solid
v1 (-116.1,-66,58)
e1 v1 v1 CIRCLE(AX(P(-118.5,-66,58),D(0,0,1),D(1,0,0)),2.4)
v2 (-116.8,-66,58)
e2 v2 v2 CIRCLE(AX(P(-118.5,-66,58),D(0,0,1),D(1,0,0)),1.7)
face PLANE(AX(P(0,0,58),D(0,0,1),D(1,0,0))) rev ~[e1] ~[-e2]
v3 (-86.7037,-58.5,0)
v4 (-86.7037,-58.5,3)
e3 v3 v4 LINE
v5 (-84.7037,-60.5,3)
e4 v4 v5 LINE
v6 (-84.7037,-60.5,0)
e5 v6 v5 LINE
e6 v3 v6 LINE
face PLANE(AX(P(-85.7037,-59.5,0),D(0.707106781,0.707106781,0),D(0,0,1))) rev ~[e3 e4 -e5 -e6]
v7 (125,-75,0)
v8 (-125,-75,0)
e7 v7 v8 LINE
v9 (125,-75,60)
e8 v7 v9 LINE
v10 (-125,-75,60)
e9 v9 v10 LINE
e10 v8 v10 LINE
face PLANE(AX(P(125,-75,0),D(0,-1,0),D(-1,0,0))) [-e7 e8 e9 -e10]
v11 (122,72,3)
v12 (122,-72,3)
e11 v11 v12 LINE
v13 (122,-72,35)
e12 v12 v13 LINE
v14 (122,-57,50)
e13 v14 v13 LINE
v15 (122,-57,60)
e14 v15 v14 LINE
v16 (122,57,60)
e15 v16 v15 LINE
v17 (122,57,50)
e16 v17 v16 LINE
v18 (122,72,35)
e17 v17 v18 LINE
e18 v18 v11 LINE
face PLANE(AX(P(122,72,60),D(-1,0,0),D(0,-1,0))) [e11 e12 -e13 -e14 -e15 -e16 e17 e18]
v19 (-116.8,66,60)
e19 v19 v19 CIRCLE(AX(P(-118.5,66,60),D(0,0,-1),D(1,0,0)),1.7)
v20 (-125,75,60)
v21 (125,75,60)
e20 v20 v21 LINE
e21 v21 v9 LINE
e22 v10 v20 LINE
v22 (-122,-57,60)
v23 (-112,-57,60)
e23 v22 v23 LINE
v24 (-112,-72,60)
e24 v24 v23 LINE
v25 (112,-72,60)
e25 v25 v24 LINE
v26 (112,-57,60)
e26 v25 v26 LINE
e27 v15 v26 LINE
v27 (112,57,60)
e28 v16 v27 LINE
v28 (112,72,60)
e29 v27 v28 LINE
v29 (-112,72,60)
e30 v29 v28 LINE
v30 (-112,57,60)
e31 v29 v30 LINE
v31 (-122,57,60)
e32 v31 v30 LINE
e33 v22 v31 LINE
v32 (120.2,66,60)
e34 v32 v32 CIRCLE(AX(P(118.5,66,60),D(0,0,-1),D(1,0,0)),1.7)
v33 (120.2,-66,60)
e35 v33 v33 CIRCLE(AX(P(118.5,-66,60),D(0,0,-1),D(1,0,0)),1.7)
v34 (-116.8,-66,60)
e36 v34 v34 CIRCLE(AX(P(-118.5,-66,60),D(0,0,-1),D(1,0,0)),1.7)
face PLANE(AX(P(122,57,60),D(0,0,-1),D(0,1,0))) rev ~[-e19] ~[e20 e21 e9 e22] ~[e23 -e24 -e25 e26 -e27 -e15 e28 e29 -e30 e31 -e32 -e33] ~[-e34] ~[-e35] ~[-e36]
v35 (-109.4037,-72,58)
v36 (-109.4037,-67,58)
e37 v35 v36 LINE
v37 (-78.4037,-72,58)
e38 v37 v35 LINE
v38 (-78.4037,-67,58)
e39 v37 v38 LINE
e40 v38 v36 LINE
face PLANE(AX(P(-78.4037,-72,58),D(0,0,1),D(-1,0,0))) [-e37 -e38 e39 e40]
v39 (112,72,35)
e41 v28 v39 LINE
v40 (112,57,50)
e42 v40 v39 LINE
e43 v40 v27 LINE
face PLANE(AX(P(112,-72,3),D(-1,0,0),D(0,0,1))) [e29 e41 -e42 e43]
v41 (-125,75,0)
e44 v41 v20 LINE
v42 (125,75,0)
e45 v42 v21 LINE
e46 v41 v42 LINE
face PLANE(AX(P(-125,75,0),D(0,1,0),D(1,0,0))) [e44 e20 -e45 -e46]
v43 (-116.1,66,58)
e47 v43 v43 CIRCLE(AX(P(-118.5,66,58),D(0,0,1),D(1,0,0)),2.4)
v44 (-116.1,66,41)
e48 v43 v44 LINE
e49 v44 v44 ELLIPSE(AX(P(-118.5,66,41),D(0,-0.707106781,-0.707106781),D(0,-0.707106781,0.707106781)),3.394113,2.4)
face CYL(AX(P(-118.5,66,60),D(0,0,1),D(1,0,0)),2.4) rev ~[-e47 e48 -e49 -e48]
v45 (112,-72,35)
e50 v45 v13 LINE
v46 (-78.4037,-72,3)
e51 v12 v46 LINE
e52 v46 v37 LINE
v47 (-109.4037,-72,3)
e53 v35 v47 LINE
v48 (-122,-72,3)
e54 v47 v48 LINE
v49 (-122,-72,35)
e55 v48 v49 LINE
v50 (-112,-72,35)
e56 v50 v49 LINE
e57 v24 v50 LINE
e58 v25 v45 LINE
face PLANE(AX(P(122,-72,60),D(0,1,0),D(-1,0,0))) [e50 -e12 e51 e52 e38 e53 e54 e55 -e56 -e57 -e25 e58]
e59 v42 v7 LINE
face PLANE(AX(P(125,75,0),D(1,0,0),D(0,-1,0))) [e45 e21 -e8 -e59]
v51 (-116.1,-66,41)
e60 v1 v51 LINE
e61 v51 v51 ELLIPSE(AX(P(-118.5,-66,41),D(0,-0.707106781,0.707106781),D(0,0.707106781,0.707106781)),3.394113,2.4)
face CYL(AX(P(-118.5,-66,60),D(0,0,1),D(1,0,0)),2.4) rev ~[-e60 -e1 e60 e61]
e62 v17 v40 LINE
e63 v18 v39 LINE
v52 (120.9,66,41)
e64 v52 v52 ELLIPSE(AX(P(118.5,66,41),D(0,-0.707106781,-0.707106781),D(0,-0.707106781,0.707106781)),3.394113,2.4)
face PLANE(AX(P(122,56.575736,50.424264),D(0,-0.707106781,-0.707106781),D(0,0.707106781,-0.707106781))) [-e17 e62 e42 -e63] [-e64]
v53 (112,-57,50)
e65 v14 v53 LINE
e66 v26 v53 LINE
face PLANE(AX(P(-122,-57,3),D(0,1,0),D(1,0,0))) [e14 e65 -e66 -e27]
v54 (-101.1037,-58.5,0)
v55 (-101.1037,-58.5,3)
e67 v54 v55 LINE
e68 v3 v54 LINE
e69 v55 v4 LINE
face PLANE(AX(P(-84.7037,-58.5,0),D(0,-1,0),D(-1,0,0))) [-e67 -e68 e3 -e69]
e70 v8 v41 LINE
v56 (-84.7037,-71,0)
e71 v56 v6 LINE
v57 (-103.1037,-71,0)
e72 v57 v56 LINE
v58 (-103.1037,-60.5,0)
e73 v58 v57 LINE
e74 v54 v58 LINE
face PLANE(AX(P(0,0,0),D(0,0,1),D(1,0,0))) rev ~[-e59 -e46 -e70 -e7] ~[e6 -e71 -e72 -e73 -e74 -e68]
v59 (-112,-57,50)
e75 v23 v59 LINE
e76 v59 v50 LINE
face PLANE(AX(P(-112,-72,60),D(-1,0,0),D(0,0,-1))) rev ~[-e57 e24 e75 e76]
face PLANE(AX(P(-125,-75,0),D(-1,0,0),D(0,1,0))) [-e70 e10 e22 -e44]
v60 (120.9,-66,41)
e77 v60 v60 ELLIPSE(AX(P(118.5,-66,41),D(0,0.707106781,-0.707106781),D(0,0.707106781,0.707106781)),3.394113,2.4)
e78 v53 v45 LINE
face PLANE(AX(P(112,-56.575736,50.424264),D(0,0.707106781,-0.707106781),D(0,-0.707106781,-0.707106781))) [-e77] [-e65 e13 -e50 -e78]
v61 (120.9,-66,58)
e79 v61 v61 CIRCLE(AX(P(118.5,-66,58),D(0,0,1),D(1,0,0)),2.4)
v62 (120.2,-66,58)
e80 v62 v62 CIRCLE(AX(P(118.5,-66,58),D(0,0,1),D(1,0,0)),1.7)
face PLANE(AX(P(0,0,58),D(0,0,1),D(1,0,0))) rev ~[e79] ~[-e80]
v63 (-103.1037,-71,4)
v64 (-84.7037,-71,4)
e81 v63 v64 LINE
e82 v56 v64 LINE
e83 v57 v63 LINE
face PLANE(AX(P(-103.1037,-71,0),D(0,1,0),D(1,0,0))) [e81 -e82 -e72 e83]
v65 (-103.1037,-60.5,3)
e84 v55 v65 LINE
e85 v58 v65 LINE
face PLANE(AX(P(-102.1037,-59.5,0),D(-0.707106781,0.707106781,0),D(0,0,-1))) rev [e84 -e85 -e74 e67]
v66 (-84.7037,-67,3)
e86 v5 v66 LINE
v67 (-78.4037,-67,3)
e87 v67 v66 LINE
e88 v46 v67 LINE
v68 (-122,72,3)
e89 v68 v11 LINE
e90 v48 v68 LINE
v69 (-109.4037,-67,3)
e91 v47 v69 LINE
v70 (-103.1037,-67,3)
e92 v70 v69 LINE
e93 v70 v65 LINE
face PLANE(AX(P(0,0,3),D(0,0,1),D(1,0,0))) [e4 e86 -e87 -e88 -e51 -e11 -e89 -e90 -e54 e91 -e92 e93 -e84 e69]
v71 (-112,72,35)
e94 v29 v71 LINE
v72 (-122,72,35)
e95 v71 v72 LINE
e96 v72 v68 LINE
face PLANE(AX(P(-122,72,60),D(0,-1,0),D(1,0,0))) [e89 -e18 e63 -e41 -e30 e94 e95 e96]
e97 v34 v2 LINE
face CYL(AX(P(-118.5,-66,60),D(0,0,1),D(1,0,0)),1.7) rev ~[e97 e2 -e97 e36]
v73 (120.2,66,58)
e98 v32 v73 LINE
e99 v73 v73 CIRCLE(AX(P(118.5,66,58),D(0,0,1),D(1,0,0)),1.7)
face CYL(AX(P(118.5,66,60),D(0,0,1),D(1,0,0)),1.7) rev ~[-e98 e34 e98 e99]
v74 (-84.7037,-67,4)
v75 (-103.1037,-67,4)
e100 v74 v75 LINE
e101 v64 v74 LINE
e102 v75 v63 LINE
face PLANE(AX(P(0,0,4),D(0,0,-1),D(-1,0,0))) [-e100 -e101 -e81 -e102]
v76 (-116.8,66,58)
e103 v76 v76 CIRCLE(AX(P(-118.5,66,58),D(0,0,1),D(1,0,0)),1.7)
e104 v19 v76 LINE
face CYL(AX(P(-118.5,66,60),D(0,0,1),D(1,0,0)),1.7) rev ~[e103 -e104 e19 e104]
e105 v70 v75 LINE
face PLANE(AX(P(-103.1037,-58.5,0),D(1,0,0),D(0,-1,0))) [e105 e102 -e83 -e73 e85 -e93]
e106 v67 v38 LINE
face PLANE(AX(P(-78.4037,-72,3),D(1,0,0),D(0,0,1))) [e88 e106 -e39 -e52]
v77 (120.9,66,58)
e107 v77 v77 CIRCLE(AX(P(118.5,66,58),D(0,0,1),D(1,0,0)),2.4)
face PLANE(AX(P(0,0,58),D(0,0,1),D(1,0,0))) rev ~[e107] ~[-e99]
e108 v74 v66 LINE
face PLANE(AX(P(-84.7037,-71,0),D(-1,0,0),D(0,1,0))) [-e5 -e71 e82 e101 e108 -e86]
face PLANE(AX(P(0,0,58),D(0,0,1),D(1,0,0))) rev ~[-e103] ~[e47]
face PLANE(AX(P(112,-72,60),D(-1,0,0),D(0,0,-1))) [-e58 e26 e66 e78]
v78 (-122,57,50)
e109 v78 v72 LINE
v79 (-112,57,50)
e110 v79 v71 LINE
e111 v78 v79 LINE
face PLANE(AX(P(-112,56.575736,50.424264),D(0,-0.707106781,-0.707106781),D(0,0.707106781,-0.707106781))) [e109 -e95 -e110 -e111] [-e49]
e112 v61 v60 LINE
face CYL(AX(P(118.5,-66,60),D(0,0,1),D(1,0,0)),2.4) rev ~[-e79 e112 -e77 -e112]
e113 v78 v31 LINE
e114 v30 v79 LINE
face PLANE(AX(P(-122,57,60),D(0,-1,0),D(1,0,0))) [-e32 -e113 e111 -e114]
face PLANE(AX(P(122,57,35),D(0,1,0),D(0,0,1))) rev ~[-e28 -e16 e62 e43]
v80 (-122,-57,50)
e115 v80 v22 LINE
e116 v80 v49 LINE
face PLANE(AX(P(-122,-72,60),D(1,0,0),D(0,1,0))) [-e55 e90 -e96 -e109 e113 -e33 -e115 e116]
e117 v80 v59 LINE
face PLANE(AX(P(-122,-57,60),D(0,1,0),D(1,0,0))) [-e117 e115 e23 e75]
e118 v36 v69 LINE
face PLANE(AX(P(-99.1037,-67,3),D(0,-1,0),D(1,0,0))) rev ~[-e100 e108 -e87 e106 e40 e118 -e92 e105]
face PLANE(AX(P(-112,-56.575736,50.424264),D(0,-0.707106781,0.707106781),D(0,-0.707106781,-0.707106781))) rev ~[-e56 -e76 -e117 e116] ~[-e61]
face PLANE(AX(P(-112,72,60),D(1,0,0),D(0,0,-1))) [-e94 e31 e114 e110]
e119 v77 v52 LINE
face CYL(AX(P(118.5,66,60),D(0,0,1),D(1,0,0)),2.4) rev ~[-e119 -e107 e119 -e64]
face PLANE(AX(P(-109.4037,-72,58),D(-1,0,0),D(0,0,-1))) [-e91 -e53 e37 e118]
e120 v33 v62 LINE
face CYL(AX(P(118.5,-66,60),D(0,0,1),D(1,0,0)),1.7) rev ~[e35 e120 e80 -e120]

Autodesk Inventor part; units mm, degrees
ref_plane "YZ Plane" through (0, 0, 0) normal (1, 0, 0) x (0, 1, 0)
ref_plane "XZ Plane" through (0, 0, 0) normal (0, 1, 0) x (-1, 0, 0)
ref_plane "XY Plane" through (0, 0, 0) normal (0, 0, 1) x (1, 0, 0)
sketch "Sketch7" plane through (0, 0, 0) normal (0, 0, 1) x (1, 0, 0)
  line L0 (125, -75) -> (-125, -75)
  line L1 (-125, -75) -> (-125, 75)
  line L2 (-125, 75) -> (125, 75)
  line L3 (125, 75) -> (125, -75)
  line L4 (125, -75) -> (-125, 75) construction
  line L5 (-125, -75) -> (125, 75) construction
  point P0 (0, 0)
  dimension "d15" = 250
  dimension "d16" = 150
extrude "Box Outside" add sketch "Sketch7" along normal blind 60
sketch "Sketch8" plane through (0, 0, 60) normal (0, 0, 1) x (1, 0, 0)
  line L0 (-122, 72) -> (122, 72)
  line L1 (122, 72) -> (122, -72)
  line L2 (122, -72) -> (-122, -72)
  line L3 (-122, -72) -> (-122, 72)
  line L4 (125, 75) -> (-125, 75) projected
  line L5 (-125, 75) -> (-125, -75) projected
  line L6 (-125, -75) -> (125, -75) projected
  line L7 (125, -75) -> (125, 75) projected
  point P0 (0, 0)
  dimension "d19" = 3
  dimension "d20" = 3
  dimension "d21" = 3
  dimension "d22" = 3
extrude "Box Cut" cut sketch "Sketch8" against normal blind 57 contours L0 L1 L2 L3
sketch "Sketch9" plane through (-122, -72, 60) normal (0, 1, 0) x (1, 0, 0)
  line L0 (0, 0) -> (10, 0)
  line L1 (10, 0) -> (10, 25)
  line L2 (10, 25) -> (0, 25)
  line L3 (0, 25) -> (0, 0)
  point P0 (122, 60)
  dimension "d25" = 10
  dimension "d26" = 25
extrude "ScrewHole Box LB" add sketch "Sketch9" along normal blind 15
sketch "Sketch10" plane through (-122, -72, 3) normal (0, 1, 0) x (1, 0, 0)
  line L0 (244, -57) -> (244, 0) projected
  line L1 (244, -57) -> (234, -57)
  line L2 (234, -57) -> (234, -32)
  line L3 (234, -32) -> (244, -32)
  line L4 (244, -32) -> (244, -57)
  point P0 (122, 3)
  dimension "d29" = 10
  dimension "d30" = 25
extrude "ScrewHole Box RB" add sketch "Sketch10" along normal blind 15
sketch "Sketch11" plane through (-122, 72, 60) normal (0, -1, 0) x (1, 0, 0)
  line L0 (0, 0) -> (244, 0) projected
  line L1 (0, 0) -> (10, 0)
  line L2 (10, 0) -> (10, -25)
  line L3 (10, -25) -> (0, -25)
  line L4 (0, -25) -> (0, 0)
  point P0 (122, -60)
  dimension "d33" = 10
  dimension "d34" = 25
extrude "ScrewHole Box LU" add sketch "Sketch11" along normal blind 15
sketch "Sketch13" plane through (122, -72, 3) normal (-1, 0, 0) x (0, 0, 1)
  line L0 (57, 144) -> (0, 144) projected
  line L1 (57, 144) -> (32, 144)
  line L2 (32, 144) -> (32, 129)
  line L3 (32, 129) -> (57, 129)
  line L4 (57, 129) -> (57, 144)
  point P0 (-3, 72)
  dimension "d37" = 25
  dimension "d38" = 15
extrude "ScrewHole Box RU" add sketch "Sketch13" along normal blind 10
sketch "Sketch27" plane through (0, 0, 60) normal (0, 0, 1) x (1, 0, 0)
  line L0 (-112, -72) -> (-112, -57) projected
  line L1 (-125, 75) -> (-125, -75) projected
  line L2 (-112, -57) -> (-125, -57)
  line L3 (-125, -57) -> (-125, -75)
  line L4 (-125, -75) -> (-112, -75)
  line L5 (-112, -75) -> (-112, -57)
  line L6 (-112, -57) -> (-125, -75)
  line L7 (-112, -75) -> (-125, -57)
  circle A0 centre (-118.5, -66) radius 2.4
  point P0 (0, 0)
  dimension "d84" = 4.8
extrude "Outside ScrewHole LB" cut sketch "Sketch27" against normal blind 26 contours A0 L7 L6 | L6 L7 A0 | A0 L6 L7 | L7 L6 A0
sketch "Sketch29" plane through (0, 0, 60) normal (0, 0, 1) x (1, 0, 0)
  line L0 (-112, -72) -> (-112, -57) projected
  line L1 (-125, -75) -> (125, -75) projected
  line L2 (-112, -57) -> (-125, -57)
  line L3 (-125, -57) -> (-125, -75)
  line L4 (-125, -75) -> (-112, -75)
  line L5 (-112, -75) -> (-112, -57)
  line L6 (-112, -57) -> (-125, -75)
  circle A0 centre (-118.5, -66) radius 2.4
  point P0 (0, 0)
extrude "ScrewRibbon LB" add sketch "Sketch29" against normal blind 2 contours A0 L6 | L6 A0
sketch "Sketch30" plane through (0, 0, 60) normal (0, 0, 1) x (1, 0, 0)
  line L0 (-122, -57) -> (-112, -57) projected
  line L1 (-125, -75) -> (125, -75) projected
  line L2 (-112, -57) -> (-125, -57)
  line L3 (-125, -57) -> (-125, -75)
  line L4 (-125, -75) -> (-112, -75)
  line L5 (-112, -75) -> (-112, -57)
  line L6 (-112, -57) -> (-125, -75)
  circle A0 centre (-118.5, -66) radius 1.7
  point P0 (0, 0)
  dimension "d92" = 3.4
extrude "Inside ScrewHole LB" cut sketch "Sketch30" against normal blind 24 contours A0 L6 | L6 A0
sketch "Sketch31" plane through (0, 0, 60) normal (0, 0, 1) x (1, 0, 0)
  line L0 (-125, 75) -> (-125, -75) projected
  line L1 (-112, 57) -> (-122, 57) projected
  line L2 (-125, 75) -> (-112, 75)
  line L3 (-112, 75) -> (-112, 57)
  line L4 (-112, 57) -> (-125, 57)
  line L5 (-125, 57) -> (-125, 75)
  line L6 (-125, 75) -> (-112, 57)
  circle A0 centre (-118.5, 66) radius 2.4
  point P0 (0, 0)
  dimension "d95" = 4.8
extrude "Outside ScrewHole LU" cut sketch "Sketch31" against normal blind 24 contours A0 L6 | L6 A0
sketch "Sketch32" plane through (0, 0, 60) normal (0, 0, 1) x (1, 0, 0)
  line L0 (-122, 57) -> (-112, 57) projected
  line L1 (-125, 75) -> (-125, -75) projected
  line L2 (-112, 57) -> (-125, 57)
  line L3 (-125, 57) -> (-125, 75)
  line L4 (-125, 75) -> (-112, 75)
  line L5 (-112, 75) -> (-112, 57)
  line L6 (-112, 75) -> (-125, 57)
  circle A0 centre (-118.5, 66) radius 2.4
  point P0 (0, 0)
  dimension "d98" = 4.8
extrude "ScrewRibbon LU" add sketch "Sketch32" against normal blind 2 contours A0 L6 | L6 A0
sketch "Sketch33" plane through (0, 0, 60) normal (0, 0, 1) x (1, 0, 0)
  line L0 (125, 75) -> (-125, 75) projected
  line L1 (-112, 57) -> (-122, 57) projected
  line L2 (-125, 75) -> (-112, 75)
  line L3 (-112, 75) -> (-112, 57)
  line L4 (-112, 57) -> (-125, 57)
  line L5 (-125, 57) -> (-125, 75)
  line L6 (-125, 75) -> (-112, 57)
  circle A0 centre (-118.5, 66) radius 1.7
  point P0 (0, 0)
  dimension "d101" = 3.4
extrude "Inside ScrewHole LU" cut sketch "Sketch33" against normal blind 21.75 contours A0 L6 | L6 A0
sketch "Sketch34" plane through (0, 0, 60) normal (0, 0, 1) x (1, 0, 0)
  line L0 (112, 57) -> (112, 72) projected
  line L1 (125, 75) -> (-125, 75) projected
  line L2 (112, 57) -> (125, 57)
  line L3 (125, 57) -> (125, 75)
  line L4 (125, 75) -> (112, 75)
  line L5 (112, 75) -> (112, 57)
  line L6 (125, 75) -> (112, 57)
  circle A0 centre (118.5, 66) radius 2.4
  point P0 (0, 0)
  dimension "d104" = 4.8
extrude "Outside ScrewHole RU" cut sketch "Sketch34" against normal blind 37 contours A0 L6 | L6 A0
sketch "Sketch35" plane through (0, 0, 60) normal (0, 0, 1) x (1, 0, 0)
  line L0 (125, -75) -> (125, 75) projected
  line L1 (122, 57) -> (112, 57) projected
  line L2 (125, 75) -> (112, 75)
  line L3 (112, 75) -> (112, 57)
  line L4 (112, 57) -> (125, 57)
  line L5 (125, 57) -> (125, 75)
  line L6 (125, 75) -> (-125, 75) projected
  line L7 (125, 75) -> (112, 57)
  circle A0 centre (118.5, 66) radius 2.4
  point P0 (0, 0)
  dimension "d107" = 4.8
extrude "ScrewRibbon RU" add sketch "Sketch35" against normal blind 2 contours A0 L7 | L7 A0
sketch "Sketch36" plane through (0, 0, 60) normal (0, 0, 1) x (1, 0, 0)
  line L0 (122, 57) -> (112, 57) projected
  line L1 (125, -75) -> (125, 75) projected
  line L2 (112, 57) -> (125, 57)
  line L3 (125, 57) -> (125, 75)
  line L4 (125, 75) -> (112, 75)
  line L5 (112, 75) -> (112, 57)
  line L6 (112, 57) -> (125, 75)
  circle A0 centre (118.5, 66) radius 2.4 projected
  circle A1 centre (118.5, 66) radius 1.7
  point P0 (0, 0)
  dimension "d110" = 3.4
extrude "Inside ScrewHole RU" cut sketch "Sketch36" against normal blind 20 contours A1 L6 | L6 A1
sketch "Sketch37" plane through (0, 0, 60) normal (0, 0, 1) x (1, 0, 0)
  line L0 (125, -75) -> (125, 75) projected
  line L1 (112, -72) -> (112, -57) projected
  line L2 (125, -75) -> (112, -75)
  line L3 (112, -75) -> (112, -57)
  line L4 (112, -57) -> (125, -57)
  line L5 (125, -57) -> (125, -75)
  line L6 (112, -75) -> (125, -57)
  circle A0 centre (118.5, -66) radius 2.4
  point P0 (0, 0)
  dimension "d113" = 4.8
extrude "Outside ScrewHole RB" cut sketch "Sketch37" against normal blind 27.5 contours A0 L6 | L6 A0
sketch "Sketch38" plane through (0, 0, 60) normal (0, 0, 1) x (1, 0, 0)
  line L0 (122, -57) -> (112, -57) projected
  line L1 (125, -75) -> (125, 75) projected
  line L2 (112, -57) -> (125, -57)
  line L3 (125, -57) -> (125, -75)
  line L4 (125, -75) -> (112, -75)
  line L5 (112, -75) -> (112, -57)
  line L6 (125, -57) -> (112, -75)
  circle A0 centre (118.5, -66) radius 2.4
  point P0 (0, 0)
  dimension "d116" = 4.8
extrude "ScrewRibbon RB" add sketch "Sketch38" against normal blind 2 contours A0 L6 | L6 A0
sketch "Sketch39" plane through (0, 0, 60) normal (0, 0, 1) x (1, 0, 0)
  line L0 (112, -72) -> (112, -57) projected
  line L1 (125, -75) -> (125, 75) projected
  line L2 (112, -57) -> (125, -57)
  line L3 (125, -57) -> (125, -75)
  line L4 (125, -75) -> (112, -75)
  line L5 (112, -75) -> (112, -57)
  line L6 (112, -75) -> (125, -57)
  circle A0 centre (118.5, -66) radius 2.4 projected
  circle A1 centre (118.5, -66) radius 1.7
  point P0 (0, 0)
  dimension "d119" = 3.4
extrude "Inside ScrewHole RB" cut sketch "Sketch39" against normal blind 20 contours A1 L6 | L6 A1
sketch "Sketch42" plane through (-122, -72, 3) normal (0, 1, 0) x (1, 0, 0)
  line L0 (244, 0) -> (0, 0) projected
  line L1 (12.5963, 0) -> (43.5963, 0)
  line L2 (43.5963, 0) -> (43.5963, -55)
  line L3 (43.5963, -55) -> (12.5963, -55)
  line L4 (12.5963, -55) -> (12.5963, 0)
  point P0 (122, 3)
  point P1 (43.5963, 0)
  dimension "d134" = 31
  dimension "d135" = 55
extrude "ESPHolder" add sketch "Sketch42" along normal blind 5
sketch "Sketch43" plane through (0, 0, 3) normal (0, 0, 1) x (1, 0, 0)
  line L0 (-109.4037, -67) -> (-78.4037, -67) projected
  line L1 (-99.1037, -67) -> (-88.7037, -67)
  line L2 (-88.7037, -67) -> (-88.7037, -62.5)
  line L3 (-88.7037, -62.5) -> (-99.1037, -62.5)
  line L4 (-99.1037, -62.5) -> (-99.1037, -67)
  line L5 (-78.4037, -67) -> (-109.4037, -67)
  line L6 (-109.4037, -67) -> (-109.4037, -51.7804)
  line L7 (-109.4037, -51.7804) -> (-78.4037, -51.7804)
  line L8 (-78.4037, -51.7804) -> (-78.4037, -67)
  point P0 (0, 0)
  dimension "d138" = 10.3
  dimension "d139" = 10.3
  dimension "d140" = 4.5
extrude "PortHole" cut sketch "Sketch43" against normal through all contours L4 L3 L2 L0
sketch "Sketch44" plane through (0, 0, 0) normal (0, 0, -1) x (-1, 0, 0)
  line L0 (84.7037, -58.5) -> (103.1037, -58.5)
  line L1 (103.1037, -58.5) -> (103.1037, -71)
  line L2 (103.1037, -71) -> (84.7037, -71)
  line L3 (84.7037, -71) -> (84.7037, -58.5)
  line L4 (88.7037, -62.5) -> (99.1037, -62.5) projected
  line L5 (99.1037, -67) -> (88.7037, -67) projected
  line L6 (99.1037, -62.5) -> (99.1037, -67) projected
  line L7 (88.7037, -67) -> (88.7037, -62.5) projected
  point P0 (0, 0)
  dimension "d143" = 4
  dimension "d144" = 4
  dimension "d145" = 4
  dimension "d146" = 4
extrude "Extrusion29" cut sketch "Sketch44" against normal blind 4
chamfer "Chamfer1" distance 15 angle 45 1 edges at (-117, -57, 35)
chamfer "Chamfer2" distance 15 angle 45 1 edges at (-117, 57, 35)
chamfer "Chamfer3" distance 15 angle 45 1 edges at (117, 57, 35)
chamfer "Chamfer4" distance 15 angle 45 1 edges at (117, -57, 35)
chamfer "Chamfer5" distance 2 angle 45 2 edges at (-84.7037, -58.5, 1.5) (-103.1037, -58.5, 1.5)
properties part number "Box2"
